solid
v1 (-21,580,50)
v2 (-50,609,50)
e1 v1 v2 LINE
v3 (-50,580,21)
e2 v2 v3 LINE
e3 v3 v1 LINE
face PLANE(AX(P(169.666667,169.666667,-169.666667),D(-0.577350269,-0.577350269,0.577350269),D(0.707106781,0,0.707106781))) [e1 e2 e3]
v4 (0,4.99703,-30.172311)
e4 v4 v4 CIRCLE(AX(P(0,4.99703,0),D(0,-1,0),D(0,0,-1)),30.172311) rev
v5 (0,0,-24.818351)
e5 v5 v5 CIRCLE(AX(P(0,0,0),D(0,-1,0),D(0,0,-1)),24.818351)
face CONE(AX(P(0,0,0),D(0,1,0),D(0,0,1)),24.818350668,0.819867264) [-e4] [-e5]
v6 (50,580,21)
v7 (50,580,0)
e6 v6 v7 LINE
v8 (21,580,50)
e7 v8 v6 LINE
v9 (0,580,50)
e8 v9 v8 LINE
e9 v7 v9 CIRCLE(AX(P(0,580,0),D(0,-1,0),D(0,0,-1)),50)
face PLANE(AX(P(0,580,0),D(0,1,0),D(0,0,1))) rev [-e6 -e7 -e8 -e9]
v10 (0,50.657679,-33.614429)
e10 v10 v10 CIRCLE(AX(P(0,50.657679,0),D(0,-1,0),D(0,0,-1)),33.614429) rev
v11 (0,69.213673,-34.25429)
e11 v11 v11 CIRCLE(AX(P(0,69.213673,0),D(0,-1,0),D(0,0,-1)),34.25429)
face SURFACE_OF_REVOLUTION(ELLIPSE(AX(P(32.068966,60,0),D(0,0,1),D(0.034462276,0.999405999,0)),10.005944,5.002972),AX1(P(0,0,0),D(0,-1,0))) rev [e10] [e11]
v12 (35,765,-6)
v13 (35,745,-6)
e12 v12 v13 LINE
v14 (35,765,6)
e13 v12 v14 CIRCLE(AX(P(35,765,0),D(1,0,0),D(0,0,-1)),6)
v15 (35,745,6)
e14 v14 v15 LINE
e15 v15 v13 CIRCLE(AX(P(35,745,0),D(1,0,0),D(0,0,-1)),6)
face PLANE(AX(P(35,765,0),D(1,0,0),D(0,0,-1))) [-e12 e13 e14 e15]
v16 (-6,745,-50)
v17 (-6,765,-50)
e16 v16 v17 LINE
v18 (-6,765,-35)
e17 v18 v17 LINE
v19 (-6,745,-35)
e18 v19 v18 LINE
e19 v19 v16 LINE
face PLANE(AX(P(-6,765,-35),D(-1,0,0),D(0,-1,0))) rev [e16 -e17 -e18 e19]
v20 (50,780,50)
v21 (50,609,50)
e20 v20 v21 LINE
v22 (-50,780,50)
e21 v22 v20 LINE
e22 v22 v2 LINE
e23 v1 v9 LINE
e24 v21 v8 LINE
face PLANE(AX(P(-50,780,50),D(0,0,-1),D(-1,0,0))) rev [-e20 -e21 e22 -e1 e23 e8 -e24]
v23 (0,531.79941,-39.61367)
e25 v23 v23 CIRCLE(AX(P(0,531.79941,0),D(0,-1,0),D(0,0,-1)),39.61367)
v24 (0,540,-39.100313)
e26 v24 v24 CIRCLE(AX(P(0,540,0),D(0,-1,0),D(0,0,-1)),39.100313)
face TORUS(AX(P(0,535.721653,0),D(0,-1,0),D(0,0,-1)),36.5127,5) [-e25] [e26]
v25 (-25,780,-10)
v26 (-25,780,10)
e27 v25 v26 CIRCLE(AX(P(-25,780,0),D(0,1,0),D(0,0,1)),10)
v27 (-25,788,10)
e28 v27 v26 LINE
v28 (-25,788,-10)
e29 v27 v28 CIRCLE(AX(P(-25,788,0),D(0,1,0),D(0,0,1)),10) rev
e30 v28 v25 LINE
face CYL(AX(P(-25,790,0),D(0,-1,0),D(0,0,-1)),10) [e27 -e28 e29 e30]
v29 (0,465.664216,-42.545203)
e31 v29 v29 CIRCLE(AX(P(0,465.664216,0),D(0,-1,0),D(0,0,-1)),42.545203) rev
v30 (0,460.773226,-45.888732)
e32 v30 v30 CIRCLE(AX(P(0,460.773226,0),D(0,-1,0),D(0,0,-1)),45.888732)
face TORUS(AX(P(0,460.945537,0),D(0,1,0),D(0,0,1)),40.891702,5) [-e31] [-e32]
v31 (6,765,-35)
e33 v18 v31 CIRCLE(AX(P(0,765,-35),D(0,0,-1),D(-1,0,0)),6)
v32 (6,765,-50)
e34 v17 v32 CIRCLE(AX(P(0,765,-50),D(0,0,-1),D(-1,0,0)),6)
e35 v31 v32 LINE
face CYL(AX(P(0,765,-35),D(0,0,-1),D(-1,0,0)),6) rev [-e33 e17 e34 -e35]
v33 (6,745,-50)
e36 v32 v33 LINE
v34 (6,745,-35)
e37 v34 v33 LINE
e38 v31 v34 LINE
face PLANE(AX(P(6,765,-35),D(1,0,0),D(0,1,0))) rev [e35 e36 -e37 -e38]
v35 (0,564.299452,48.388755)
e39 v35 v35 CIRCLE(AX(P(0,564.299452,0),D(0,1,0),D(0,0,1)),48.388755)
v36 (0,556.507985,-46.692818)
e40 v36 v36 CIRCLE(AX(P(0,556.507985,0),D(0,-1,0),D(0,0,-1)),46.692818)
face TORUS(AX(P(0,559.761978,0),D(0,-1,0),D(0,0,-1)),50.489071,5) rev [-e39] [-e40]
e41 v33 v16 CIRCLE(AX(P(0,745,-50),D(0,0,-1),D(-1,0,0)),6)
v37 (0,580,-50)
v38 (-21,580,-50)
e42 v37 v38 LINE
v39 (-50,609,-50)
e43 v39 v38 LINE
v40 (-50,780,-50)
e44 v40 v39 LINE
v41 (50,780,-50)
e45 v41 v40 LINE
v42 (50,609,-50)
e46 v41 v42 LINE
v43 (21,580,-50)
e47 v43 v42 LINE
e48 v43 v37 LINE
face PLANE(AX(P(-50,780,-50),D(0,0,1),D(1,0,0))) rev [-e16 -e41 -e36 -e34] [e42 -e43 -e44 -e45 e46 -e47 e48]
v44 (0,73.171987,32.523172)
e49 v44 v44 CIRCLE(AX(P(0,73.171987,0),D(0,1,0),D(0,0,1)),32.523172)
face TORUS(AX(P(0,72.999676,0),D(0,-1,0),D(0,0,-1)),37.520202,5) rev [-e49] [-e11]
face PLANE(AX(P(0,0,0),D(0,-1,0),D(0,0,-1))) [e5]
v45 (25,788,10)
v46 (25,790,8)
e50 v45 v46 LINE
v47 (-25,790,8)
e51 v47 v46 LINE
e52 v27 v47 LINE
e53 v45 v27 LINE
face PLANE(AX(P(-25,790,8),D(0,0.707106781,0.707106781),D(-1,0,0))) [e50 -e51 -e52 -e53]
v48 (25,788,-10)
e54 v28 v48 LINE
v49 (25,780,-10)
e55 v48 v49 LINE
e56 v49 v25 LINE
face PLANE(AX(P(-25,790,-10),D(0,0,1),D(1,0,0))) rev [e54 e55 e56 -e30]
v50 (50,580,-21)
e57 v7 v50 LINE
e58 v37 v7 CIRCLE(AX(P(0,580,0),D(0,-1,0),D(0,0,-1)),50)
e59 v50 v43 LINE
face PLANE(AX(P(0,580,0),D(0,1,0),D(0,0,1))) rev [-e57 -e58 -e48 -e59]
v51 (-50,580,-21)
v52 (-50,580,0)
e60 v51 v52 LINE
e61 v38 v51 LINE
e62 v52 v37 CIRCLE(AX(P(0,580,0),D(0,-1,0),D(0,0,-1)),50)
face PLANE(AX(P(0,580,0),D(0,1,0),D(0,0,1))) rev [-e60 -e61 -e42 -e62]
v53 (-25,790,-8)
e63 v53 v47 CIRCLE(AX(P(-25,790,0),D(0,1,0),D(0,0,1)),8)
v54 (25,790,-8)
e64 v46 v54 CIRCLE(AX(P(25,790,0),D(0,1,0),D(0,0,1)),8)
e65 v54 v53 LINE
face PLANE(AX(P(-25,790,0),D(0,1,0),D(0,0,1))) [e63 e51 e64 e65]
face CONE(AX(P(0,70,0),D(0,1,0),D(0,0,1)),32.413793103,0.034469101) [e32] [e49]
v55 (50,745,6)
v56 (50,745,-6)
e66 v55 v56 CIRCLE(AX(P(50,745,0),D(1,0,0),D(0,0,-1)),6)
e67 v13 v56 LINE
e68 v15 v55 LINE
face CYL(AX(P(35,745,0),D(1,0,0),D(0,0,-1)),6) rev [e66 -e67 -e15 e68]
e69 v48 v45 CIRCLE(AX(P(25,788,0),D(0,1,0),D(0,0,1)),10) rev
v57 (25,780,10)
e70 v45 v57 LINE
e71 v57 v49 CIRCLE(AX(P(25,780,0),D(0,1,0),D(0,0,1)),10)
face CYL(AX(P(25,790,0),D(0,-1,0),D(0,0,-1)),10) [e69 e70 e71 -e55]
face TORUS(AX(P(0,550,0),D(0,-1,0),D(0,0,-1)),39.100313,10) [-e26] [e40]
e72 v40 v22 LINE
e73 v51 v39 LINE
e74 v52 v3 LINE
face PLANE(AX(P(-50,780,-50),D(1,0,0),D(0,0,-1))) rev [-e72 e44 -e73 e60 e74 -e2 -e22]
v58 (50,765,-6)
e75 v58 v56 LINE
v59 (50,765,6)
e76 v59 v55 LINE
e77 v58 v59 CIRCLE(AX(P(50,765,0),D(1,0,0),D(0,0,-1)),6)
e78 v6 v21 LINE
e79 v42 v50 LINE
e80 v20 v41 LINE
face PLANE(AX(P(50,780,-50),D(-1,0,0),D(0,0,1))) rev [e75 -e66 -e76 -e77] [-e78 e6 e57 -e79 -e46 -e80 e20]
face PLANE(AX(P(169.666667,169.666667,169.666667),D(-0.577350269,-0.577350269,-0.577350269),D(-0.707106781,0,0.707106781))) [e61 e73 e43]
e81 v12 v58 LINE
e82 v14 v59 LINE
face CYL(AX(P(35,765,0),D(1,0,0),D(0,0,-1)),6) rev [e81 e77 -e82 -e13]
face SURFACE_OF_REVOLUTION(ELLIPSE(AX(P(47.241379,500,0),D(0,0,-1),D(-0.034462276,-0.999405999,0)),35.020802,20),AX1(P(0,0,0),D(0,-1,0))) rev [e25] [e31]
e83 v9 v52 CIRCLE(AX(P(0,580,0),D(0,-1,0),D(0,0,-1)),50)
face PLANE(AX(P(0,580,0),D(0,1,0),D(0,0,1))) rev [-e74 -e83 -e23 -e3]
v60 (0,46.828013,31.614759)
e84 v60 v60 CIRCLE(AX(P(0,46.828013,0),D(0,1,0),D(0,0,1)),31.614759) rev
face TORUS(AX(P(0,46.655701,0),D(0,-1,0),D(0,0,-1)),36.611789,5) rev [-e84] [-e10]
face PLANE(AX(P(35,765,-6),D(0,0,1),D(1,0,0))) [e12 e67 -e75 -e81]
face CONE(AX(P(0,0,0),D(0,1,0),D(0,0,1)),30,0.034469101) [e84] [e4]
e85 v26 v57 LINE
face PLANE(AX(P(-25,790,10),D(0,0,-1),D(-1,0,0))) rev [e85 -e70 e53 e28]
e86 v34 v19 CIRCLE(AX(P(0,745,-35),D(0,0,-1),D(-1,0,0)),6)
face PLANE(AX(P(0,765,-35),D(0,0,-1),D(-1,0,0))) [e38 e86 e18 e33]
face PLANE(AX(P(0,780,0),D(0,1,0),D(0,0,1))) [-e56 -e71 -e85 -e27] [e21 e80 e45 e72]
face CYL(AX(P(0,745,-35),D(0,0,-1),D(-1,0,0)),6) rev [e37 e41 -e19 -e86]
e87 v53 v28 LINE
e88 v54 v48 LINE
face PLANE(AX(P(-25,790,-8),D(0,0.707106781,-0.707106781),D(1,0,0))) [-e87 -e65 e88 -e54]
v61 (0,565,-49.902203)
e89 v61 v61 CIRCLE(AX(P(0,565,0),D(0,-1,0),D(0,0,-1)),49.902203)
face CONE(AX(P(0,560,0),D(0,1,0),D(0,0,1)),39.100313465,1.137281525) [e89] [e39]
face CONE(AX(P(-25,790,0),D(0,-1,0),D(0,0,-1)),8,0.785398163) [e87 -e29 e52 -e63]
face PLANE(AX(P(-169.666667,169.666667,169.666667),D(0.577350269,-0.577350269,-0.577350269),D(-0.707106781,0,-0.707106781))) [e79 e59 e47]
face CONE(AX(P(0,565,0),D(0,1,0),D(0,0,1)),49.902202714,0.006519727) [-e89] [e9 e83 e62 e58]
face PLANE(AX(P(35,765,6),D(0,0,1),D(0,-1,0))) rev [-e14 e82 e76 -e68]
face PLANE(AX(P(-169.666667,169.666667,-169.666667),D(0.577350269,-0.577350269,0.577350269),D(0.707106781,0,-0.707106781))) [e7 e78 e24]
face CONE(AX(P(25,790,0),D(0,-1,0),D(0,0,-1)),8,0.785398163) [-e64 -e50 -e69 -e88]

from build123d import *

# Parameters (mm, degrees)
ESQUISSE2_W             = 100
ESQUISSE2_H             = 100
BOSS_EXTRU_1_DEPTH      = 200
CHANFREIN1_SIZE         = 5
CHANFREIN1_SIZE2        = 5.181649332
CONG_2_R                = 5
CONG_4_R                = 5
CONG_5_R                = 5
BOSS_EXTRU_2_DEPTH      = 10
CHANFREIN2_SIZE         = 2
ENL_V_MAT_EXTRU_1_DEPTH = 15
ENL_V_MAT_EXTRU_2_DEPTH = 15
CHANFREIN3_START        = -293.871287018
CHANFREIN3_DEPTH        = 16.743157807
CHANFREIN4_START        = -293.871287018
CHANFREIN4_DEPTH        = 16.743157807
CHANFREIN5_START        = 277.128129211
CHANFREIN5_DEPTH        = 16.743157807
CHANFREIN6_START        = 277.128129211
CHANFREIN6_DEPTH        = 16.743157807


with BuildPart() as part:
    # Esquisse1 → Révolution1 (revolve)
    with BuildSketch(Plane.XY, mode=Mode.PRIVATE) as r_volution1_sk:
        with BuildLine():
            Line((0, 0), (0, 580))
            Line((0, 580), (50, 580))
            Line((50, 580), (49.902202714, 565))
            Line((49.902202714, 565), (39.100313465, 560))
            ThreePointArc((39.100313465, 560), (49.100313465, 550), (39.100313465, 540))
            Line((39.100313465, 540), (48.448275862, 535))
            add(Edge.make_bspline(
                [(48.448275862, 535), (28.460155875, 535.689245517), (27.253259323, 500.689245517), (26.046362772, 465.689245517), (46.034482759, 465)],
                knots=[3.141592654, 3.141592654, 3.141592654, 4.71238898, 4.71238898, 6.283185307, 6.283185307, 6.283185307], degree=2, weights=[1, 0.707106781, 1, 0.707106781, 1]))
            Line((46.034482759, 465), (32.413793103, 70))
            add(Edge.make_bspline(
                [(31.724137931, 50), (36.724137931, 49.827586207), (37.068965517, 59.827586207), (37.413793103, 69.827586207), (32.413793103, 70)],
                knots=[3.141592654, 3.141592654, 3.141592654, 4.71238898, 4.71238898, 6.283185307, 6.283185307, 6.283185307], degree=2, weights=[1, 0.707106781, 1, 0.707106781, 1]))
            Line((31.724137931, 50), (30, 0))
            Line((30, 0), (0, 0))
        make_face()
    revolve(r_volution1_sk.sketch.rotate(Axis((0, 0, 0), (0, 1, 0)), 90), axis=Axis((0, 0, 0), (0, 1, 0)))

    # Esquisse2 → Boss.-Extru.1 (add)
    with BuildSketch(Plane(origin=(0, 580, 0), x_dir=(1, 0, 0), z_dir=(0, 1, 0))):
        Rectangle(ESQUISSE2_W, ESQUISSE2_H)
    extrude(amount=BOSS_EXTRU_1_DEPTH)

    # Chanfrein1
    chanfrein1_edges = [part.edges().sort_by_distance(p)[0] for p in [
        (0, 0, 30),
    ]]
    chanfrein1_side = [part.faces().sort_by_distance(p)[0] for p in [
        (0, 25, 30.862068966),
    ]]
    chamfer(chanfrein1_edges, length=CHANFREIN1_SIZE, length2=CHANFREIN1_SIZE2, reference=chanfrein1_side[0])

    # Congé2
    cong_2_edges = [part.edges().sort_by_distance(p)[0] for p in [
        (0, 70, 32.413793103),
        (0, 50, 31.724137931),
    ]]
    fillet(cong_2_edges, radius=CONG_2_R)

    # Congé3: read off the stored shape, not the designer's step
    # Congé3 outline → Congé3 (revolve, cut)
    with BuildSketch(Plane.XY):
        with BuildLine():
            ThreePointArc((39.100313465, 540), (41.502931935, 536.034040873), (39.613670138, 531.799410173))
            Line((39.613670138, 531.799410173), (48.448275862, 531.799410173))
            Line((48.448275862, 531.799410173), (48.448275862, 535))
            Line((48.448275862, 535), (39.100313465, 540))
        make_face()
    revolve(axis=Axis((0, 0, 0), (0, 1, 0)), mode=Mode.SUBTRACT)

    # Congé4
    cong_4_edges = [part.edges().sort_by_distance(p)[0] for p in [
        (0, 465, 46.034482759),
    ]]
    fillet(cong_4_edges, radius=CONG_4_R)

    # Congé5
    cong_5_edges = [part.edges().sort_by_distance(p)[0] for p in [
        (0, 560, 39.100313465),
    ]]
    fillet(cong_5_edges, radius=CONG_5_R)

    # Esquisse3 → Boss.-Extru.2 (add)
    with BuildSketch(Plane(origin=(0, 780, 0), x_dir=(1, 0, 0), z_dir=(0, 1, 0))):
        with BuildLine():
            Line((-25, 10), (25, 10))
            ThreePointArc((25, 10), (35, 0), (25, -10))
            Line((25, -10), (-25, -10))
            ThreePointArc((-25, -10), (-35, 0), (-25, 10))
        make_face()
    extrude(amount=BOSS_EXTRU_2_DEPTH)

    # Chanfrein2
    chanfrein2_edges = [part.edges().sort_by_distance(p)[0] for p in [
        (-35, 790, 0),
        (0, 790, 10),
        (35, 790, 0),
        (0, 790, -10),
    ]]
    chamfer(chanfrein2_edges, length=CHANFREIN2_SIZE)

    # Esquisse5 → Enlèv. mat.-Extru.1 (cut)
    with BuildSketch(Plane(origin=(50, 0, 0), x_dir=(0, 0, -1), z_dir=(1, 0, 0))):
        with BuildLine():
            Line((6, 765), (6, 745))
            ThreePointArc((6, 745), (0, 739), (-6, 745))
            Line((-6, 745), (-6, 765))
            ThreePointArc((-6, 765), (0, 771), (6, 765))
        make_face()
    extrude(amount=-ENL_V_MAT_EXTRU_1_DEPTH, mode=Mode.SUBTRACT)

    # Esquisse6 → Enlèv. mat.-Extru.2 (cut)
    with BuildSketch(Plane(origin=(0, 0, -50), x_dir=(-1, 0, 0), z_dir=(0, 0, -1))):
        with BuildLine():
            Line((6, 765), (6, 745))
            ThreePointArc((6, 745), (0, 739), (-6, 745))
            Line((-6, 745), (-6, 765))
            ThreePointArc((-6, 765), (0, 771), (6, 765))
        make_face()
    extrude(amount=-ENL_V_MAT_EXTRU_2_DEPTH, mode=Mode.SUBTRACT)

    # Chanfrein3: read off the stored shape, not the designer's step
    # Chanfrein3 outline → Chanfrein3 (cut)
    with BuildSketch(Plane(origin=(0, 0, 0), x_dir=(0.8164965809277258, 0.4082482904638629, 0.4082482904638636), z_dir=(0.5773502691896261, -0.5773502691896252, -0.5773502691896261)).offset(CHANFREIN3_START)):
        Polygon((233.518022145, -445.477272148), (269.035623416, -465.983368802), (269.035623416, -424.971175493), align=None)
    extrude(amount=CHANFREIN3_DEPTH, mode=Mode.SUBTRACT)

    # Chanfrein4: read off the stored shape, not the designer's step
    # Chanfrein4 outline → Chanfrein4 (cut)
    with BuildSketch(Plane(origin=(0, 0, 0), x_dir=(0.8164965809277258, 0.4082482904638629, -0.4082482904638636), z_dir=(0.5773502691896261, -0.5773502691896252, 0.5773502691896261)).offset(CHANFREIN4_START)):
        Polygon((269.035623416, 424.971175493), (269.035623416, 465.983368802), (233.518022145, 445.477272148), align=None)
    extrude(amount=CHANFREIN4_DEPTH, mode=Mode.SUBTRACT)

    # Chanfrein5: read off the stored shape, not the designer's step
    # Chanfrein5 outline → Chanfrein5 (cut)
    with BuildSketch(Plane(origin=(0, 0, 0), x_dir=(0.8164965809277258, -0.408248290463863, 0.4082482904638638), z_dir=(0.5773502691896262, 0.5773502691896252, -0.5773502691896262)).offset(CHANFREIN5_START)):
        Polygon((-269.035623416, -424.971175493), (-269.035623416, -465.983368802), (-233.518022145, -445.477272148), align=None)
    extrude(amount=CHANFREIN5_DEPTH, mode=Mode.SUBTRACT)

    # Chanfrein6: read off the stored shape, not the designer's step
    # Chanfrein6 outline → Chanfrein6 (cut)
    with BuildSketch(Plane(origin=(0, 0, 0), x_dir=(0.8164965809277258, -0.408248290463863, -0.4082482904638638), z_dir=(0.5773502691896262, 0.5773502691896252, 0.5773502691896262)).offset(CHANFREIN6_START)):
        Polygon((-269.035623416, 465.983368802), (-269.035623416, 424.971175493), (-233.518022145, 445.477272148), align=None)
    extrude(amount=CHANFREIN6_DEPTH, mode=Mode.SUBTRACT)


solid = part.part
